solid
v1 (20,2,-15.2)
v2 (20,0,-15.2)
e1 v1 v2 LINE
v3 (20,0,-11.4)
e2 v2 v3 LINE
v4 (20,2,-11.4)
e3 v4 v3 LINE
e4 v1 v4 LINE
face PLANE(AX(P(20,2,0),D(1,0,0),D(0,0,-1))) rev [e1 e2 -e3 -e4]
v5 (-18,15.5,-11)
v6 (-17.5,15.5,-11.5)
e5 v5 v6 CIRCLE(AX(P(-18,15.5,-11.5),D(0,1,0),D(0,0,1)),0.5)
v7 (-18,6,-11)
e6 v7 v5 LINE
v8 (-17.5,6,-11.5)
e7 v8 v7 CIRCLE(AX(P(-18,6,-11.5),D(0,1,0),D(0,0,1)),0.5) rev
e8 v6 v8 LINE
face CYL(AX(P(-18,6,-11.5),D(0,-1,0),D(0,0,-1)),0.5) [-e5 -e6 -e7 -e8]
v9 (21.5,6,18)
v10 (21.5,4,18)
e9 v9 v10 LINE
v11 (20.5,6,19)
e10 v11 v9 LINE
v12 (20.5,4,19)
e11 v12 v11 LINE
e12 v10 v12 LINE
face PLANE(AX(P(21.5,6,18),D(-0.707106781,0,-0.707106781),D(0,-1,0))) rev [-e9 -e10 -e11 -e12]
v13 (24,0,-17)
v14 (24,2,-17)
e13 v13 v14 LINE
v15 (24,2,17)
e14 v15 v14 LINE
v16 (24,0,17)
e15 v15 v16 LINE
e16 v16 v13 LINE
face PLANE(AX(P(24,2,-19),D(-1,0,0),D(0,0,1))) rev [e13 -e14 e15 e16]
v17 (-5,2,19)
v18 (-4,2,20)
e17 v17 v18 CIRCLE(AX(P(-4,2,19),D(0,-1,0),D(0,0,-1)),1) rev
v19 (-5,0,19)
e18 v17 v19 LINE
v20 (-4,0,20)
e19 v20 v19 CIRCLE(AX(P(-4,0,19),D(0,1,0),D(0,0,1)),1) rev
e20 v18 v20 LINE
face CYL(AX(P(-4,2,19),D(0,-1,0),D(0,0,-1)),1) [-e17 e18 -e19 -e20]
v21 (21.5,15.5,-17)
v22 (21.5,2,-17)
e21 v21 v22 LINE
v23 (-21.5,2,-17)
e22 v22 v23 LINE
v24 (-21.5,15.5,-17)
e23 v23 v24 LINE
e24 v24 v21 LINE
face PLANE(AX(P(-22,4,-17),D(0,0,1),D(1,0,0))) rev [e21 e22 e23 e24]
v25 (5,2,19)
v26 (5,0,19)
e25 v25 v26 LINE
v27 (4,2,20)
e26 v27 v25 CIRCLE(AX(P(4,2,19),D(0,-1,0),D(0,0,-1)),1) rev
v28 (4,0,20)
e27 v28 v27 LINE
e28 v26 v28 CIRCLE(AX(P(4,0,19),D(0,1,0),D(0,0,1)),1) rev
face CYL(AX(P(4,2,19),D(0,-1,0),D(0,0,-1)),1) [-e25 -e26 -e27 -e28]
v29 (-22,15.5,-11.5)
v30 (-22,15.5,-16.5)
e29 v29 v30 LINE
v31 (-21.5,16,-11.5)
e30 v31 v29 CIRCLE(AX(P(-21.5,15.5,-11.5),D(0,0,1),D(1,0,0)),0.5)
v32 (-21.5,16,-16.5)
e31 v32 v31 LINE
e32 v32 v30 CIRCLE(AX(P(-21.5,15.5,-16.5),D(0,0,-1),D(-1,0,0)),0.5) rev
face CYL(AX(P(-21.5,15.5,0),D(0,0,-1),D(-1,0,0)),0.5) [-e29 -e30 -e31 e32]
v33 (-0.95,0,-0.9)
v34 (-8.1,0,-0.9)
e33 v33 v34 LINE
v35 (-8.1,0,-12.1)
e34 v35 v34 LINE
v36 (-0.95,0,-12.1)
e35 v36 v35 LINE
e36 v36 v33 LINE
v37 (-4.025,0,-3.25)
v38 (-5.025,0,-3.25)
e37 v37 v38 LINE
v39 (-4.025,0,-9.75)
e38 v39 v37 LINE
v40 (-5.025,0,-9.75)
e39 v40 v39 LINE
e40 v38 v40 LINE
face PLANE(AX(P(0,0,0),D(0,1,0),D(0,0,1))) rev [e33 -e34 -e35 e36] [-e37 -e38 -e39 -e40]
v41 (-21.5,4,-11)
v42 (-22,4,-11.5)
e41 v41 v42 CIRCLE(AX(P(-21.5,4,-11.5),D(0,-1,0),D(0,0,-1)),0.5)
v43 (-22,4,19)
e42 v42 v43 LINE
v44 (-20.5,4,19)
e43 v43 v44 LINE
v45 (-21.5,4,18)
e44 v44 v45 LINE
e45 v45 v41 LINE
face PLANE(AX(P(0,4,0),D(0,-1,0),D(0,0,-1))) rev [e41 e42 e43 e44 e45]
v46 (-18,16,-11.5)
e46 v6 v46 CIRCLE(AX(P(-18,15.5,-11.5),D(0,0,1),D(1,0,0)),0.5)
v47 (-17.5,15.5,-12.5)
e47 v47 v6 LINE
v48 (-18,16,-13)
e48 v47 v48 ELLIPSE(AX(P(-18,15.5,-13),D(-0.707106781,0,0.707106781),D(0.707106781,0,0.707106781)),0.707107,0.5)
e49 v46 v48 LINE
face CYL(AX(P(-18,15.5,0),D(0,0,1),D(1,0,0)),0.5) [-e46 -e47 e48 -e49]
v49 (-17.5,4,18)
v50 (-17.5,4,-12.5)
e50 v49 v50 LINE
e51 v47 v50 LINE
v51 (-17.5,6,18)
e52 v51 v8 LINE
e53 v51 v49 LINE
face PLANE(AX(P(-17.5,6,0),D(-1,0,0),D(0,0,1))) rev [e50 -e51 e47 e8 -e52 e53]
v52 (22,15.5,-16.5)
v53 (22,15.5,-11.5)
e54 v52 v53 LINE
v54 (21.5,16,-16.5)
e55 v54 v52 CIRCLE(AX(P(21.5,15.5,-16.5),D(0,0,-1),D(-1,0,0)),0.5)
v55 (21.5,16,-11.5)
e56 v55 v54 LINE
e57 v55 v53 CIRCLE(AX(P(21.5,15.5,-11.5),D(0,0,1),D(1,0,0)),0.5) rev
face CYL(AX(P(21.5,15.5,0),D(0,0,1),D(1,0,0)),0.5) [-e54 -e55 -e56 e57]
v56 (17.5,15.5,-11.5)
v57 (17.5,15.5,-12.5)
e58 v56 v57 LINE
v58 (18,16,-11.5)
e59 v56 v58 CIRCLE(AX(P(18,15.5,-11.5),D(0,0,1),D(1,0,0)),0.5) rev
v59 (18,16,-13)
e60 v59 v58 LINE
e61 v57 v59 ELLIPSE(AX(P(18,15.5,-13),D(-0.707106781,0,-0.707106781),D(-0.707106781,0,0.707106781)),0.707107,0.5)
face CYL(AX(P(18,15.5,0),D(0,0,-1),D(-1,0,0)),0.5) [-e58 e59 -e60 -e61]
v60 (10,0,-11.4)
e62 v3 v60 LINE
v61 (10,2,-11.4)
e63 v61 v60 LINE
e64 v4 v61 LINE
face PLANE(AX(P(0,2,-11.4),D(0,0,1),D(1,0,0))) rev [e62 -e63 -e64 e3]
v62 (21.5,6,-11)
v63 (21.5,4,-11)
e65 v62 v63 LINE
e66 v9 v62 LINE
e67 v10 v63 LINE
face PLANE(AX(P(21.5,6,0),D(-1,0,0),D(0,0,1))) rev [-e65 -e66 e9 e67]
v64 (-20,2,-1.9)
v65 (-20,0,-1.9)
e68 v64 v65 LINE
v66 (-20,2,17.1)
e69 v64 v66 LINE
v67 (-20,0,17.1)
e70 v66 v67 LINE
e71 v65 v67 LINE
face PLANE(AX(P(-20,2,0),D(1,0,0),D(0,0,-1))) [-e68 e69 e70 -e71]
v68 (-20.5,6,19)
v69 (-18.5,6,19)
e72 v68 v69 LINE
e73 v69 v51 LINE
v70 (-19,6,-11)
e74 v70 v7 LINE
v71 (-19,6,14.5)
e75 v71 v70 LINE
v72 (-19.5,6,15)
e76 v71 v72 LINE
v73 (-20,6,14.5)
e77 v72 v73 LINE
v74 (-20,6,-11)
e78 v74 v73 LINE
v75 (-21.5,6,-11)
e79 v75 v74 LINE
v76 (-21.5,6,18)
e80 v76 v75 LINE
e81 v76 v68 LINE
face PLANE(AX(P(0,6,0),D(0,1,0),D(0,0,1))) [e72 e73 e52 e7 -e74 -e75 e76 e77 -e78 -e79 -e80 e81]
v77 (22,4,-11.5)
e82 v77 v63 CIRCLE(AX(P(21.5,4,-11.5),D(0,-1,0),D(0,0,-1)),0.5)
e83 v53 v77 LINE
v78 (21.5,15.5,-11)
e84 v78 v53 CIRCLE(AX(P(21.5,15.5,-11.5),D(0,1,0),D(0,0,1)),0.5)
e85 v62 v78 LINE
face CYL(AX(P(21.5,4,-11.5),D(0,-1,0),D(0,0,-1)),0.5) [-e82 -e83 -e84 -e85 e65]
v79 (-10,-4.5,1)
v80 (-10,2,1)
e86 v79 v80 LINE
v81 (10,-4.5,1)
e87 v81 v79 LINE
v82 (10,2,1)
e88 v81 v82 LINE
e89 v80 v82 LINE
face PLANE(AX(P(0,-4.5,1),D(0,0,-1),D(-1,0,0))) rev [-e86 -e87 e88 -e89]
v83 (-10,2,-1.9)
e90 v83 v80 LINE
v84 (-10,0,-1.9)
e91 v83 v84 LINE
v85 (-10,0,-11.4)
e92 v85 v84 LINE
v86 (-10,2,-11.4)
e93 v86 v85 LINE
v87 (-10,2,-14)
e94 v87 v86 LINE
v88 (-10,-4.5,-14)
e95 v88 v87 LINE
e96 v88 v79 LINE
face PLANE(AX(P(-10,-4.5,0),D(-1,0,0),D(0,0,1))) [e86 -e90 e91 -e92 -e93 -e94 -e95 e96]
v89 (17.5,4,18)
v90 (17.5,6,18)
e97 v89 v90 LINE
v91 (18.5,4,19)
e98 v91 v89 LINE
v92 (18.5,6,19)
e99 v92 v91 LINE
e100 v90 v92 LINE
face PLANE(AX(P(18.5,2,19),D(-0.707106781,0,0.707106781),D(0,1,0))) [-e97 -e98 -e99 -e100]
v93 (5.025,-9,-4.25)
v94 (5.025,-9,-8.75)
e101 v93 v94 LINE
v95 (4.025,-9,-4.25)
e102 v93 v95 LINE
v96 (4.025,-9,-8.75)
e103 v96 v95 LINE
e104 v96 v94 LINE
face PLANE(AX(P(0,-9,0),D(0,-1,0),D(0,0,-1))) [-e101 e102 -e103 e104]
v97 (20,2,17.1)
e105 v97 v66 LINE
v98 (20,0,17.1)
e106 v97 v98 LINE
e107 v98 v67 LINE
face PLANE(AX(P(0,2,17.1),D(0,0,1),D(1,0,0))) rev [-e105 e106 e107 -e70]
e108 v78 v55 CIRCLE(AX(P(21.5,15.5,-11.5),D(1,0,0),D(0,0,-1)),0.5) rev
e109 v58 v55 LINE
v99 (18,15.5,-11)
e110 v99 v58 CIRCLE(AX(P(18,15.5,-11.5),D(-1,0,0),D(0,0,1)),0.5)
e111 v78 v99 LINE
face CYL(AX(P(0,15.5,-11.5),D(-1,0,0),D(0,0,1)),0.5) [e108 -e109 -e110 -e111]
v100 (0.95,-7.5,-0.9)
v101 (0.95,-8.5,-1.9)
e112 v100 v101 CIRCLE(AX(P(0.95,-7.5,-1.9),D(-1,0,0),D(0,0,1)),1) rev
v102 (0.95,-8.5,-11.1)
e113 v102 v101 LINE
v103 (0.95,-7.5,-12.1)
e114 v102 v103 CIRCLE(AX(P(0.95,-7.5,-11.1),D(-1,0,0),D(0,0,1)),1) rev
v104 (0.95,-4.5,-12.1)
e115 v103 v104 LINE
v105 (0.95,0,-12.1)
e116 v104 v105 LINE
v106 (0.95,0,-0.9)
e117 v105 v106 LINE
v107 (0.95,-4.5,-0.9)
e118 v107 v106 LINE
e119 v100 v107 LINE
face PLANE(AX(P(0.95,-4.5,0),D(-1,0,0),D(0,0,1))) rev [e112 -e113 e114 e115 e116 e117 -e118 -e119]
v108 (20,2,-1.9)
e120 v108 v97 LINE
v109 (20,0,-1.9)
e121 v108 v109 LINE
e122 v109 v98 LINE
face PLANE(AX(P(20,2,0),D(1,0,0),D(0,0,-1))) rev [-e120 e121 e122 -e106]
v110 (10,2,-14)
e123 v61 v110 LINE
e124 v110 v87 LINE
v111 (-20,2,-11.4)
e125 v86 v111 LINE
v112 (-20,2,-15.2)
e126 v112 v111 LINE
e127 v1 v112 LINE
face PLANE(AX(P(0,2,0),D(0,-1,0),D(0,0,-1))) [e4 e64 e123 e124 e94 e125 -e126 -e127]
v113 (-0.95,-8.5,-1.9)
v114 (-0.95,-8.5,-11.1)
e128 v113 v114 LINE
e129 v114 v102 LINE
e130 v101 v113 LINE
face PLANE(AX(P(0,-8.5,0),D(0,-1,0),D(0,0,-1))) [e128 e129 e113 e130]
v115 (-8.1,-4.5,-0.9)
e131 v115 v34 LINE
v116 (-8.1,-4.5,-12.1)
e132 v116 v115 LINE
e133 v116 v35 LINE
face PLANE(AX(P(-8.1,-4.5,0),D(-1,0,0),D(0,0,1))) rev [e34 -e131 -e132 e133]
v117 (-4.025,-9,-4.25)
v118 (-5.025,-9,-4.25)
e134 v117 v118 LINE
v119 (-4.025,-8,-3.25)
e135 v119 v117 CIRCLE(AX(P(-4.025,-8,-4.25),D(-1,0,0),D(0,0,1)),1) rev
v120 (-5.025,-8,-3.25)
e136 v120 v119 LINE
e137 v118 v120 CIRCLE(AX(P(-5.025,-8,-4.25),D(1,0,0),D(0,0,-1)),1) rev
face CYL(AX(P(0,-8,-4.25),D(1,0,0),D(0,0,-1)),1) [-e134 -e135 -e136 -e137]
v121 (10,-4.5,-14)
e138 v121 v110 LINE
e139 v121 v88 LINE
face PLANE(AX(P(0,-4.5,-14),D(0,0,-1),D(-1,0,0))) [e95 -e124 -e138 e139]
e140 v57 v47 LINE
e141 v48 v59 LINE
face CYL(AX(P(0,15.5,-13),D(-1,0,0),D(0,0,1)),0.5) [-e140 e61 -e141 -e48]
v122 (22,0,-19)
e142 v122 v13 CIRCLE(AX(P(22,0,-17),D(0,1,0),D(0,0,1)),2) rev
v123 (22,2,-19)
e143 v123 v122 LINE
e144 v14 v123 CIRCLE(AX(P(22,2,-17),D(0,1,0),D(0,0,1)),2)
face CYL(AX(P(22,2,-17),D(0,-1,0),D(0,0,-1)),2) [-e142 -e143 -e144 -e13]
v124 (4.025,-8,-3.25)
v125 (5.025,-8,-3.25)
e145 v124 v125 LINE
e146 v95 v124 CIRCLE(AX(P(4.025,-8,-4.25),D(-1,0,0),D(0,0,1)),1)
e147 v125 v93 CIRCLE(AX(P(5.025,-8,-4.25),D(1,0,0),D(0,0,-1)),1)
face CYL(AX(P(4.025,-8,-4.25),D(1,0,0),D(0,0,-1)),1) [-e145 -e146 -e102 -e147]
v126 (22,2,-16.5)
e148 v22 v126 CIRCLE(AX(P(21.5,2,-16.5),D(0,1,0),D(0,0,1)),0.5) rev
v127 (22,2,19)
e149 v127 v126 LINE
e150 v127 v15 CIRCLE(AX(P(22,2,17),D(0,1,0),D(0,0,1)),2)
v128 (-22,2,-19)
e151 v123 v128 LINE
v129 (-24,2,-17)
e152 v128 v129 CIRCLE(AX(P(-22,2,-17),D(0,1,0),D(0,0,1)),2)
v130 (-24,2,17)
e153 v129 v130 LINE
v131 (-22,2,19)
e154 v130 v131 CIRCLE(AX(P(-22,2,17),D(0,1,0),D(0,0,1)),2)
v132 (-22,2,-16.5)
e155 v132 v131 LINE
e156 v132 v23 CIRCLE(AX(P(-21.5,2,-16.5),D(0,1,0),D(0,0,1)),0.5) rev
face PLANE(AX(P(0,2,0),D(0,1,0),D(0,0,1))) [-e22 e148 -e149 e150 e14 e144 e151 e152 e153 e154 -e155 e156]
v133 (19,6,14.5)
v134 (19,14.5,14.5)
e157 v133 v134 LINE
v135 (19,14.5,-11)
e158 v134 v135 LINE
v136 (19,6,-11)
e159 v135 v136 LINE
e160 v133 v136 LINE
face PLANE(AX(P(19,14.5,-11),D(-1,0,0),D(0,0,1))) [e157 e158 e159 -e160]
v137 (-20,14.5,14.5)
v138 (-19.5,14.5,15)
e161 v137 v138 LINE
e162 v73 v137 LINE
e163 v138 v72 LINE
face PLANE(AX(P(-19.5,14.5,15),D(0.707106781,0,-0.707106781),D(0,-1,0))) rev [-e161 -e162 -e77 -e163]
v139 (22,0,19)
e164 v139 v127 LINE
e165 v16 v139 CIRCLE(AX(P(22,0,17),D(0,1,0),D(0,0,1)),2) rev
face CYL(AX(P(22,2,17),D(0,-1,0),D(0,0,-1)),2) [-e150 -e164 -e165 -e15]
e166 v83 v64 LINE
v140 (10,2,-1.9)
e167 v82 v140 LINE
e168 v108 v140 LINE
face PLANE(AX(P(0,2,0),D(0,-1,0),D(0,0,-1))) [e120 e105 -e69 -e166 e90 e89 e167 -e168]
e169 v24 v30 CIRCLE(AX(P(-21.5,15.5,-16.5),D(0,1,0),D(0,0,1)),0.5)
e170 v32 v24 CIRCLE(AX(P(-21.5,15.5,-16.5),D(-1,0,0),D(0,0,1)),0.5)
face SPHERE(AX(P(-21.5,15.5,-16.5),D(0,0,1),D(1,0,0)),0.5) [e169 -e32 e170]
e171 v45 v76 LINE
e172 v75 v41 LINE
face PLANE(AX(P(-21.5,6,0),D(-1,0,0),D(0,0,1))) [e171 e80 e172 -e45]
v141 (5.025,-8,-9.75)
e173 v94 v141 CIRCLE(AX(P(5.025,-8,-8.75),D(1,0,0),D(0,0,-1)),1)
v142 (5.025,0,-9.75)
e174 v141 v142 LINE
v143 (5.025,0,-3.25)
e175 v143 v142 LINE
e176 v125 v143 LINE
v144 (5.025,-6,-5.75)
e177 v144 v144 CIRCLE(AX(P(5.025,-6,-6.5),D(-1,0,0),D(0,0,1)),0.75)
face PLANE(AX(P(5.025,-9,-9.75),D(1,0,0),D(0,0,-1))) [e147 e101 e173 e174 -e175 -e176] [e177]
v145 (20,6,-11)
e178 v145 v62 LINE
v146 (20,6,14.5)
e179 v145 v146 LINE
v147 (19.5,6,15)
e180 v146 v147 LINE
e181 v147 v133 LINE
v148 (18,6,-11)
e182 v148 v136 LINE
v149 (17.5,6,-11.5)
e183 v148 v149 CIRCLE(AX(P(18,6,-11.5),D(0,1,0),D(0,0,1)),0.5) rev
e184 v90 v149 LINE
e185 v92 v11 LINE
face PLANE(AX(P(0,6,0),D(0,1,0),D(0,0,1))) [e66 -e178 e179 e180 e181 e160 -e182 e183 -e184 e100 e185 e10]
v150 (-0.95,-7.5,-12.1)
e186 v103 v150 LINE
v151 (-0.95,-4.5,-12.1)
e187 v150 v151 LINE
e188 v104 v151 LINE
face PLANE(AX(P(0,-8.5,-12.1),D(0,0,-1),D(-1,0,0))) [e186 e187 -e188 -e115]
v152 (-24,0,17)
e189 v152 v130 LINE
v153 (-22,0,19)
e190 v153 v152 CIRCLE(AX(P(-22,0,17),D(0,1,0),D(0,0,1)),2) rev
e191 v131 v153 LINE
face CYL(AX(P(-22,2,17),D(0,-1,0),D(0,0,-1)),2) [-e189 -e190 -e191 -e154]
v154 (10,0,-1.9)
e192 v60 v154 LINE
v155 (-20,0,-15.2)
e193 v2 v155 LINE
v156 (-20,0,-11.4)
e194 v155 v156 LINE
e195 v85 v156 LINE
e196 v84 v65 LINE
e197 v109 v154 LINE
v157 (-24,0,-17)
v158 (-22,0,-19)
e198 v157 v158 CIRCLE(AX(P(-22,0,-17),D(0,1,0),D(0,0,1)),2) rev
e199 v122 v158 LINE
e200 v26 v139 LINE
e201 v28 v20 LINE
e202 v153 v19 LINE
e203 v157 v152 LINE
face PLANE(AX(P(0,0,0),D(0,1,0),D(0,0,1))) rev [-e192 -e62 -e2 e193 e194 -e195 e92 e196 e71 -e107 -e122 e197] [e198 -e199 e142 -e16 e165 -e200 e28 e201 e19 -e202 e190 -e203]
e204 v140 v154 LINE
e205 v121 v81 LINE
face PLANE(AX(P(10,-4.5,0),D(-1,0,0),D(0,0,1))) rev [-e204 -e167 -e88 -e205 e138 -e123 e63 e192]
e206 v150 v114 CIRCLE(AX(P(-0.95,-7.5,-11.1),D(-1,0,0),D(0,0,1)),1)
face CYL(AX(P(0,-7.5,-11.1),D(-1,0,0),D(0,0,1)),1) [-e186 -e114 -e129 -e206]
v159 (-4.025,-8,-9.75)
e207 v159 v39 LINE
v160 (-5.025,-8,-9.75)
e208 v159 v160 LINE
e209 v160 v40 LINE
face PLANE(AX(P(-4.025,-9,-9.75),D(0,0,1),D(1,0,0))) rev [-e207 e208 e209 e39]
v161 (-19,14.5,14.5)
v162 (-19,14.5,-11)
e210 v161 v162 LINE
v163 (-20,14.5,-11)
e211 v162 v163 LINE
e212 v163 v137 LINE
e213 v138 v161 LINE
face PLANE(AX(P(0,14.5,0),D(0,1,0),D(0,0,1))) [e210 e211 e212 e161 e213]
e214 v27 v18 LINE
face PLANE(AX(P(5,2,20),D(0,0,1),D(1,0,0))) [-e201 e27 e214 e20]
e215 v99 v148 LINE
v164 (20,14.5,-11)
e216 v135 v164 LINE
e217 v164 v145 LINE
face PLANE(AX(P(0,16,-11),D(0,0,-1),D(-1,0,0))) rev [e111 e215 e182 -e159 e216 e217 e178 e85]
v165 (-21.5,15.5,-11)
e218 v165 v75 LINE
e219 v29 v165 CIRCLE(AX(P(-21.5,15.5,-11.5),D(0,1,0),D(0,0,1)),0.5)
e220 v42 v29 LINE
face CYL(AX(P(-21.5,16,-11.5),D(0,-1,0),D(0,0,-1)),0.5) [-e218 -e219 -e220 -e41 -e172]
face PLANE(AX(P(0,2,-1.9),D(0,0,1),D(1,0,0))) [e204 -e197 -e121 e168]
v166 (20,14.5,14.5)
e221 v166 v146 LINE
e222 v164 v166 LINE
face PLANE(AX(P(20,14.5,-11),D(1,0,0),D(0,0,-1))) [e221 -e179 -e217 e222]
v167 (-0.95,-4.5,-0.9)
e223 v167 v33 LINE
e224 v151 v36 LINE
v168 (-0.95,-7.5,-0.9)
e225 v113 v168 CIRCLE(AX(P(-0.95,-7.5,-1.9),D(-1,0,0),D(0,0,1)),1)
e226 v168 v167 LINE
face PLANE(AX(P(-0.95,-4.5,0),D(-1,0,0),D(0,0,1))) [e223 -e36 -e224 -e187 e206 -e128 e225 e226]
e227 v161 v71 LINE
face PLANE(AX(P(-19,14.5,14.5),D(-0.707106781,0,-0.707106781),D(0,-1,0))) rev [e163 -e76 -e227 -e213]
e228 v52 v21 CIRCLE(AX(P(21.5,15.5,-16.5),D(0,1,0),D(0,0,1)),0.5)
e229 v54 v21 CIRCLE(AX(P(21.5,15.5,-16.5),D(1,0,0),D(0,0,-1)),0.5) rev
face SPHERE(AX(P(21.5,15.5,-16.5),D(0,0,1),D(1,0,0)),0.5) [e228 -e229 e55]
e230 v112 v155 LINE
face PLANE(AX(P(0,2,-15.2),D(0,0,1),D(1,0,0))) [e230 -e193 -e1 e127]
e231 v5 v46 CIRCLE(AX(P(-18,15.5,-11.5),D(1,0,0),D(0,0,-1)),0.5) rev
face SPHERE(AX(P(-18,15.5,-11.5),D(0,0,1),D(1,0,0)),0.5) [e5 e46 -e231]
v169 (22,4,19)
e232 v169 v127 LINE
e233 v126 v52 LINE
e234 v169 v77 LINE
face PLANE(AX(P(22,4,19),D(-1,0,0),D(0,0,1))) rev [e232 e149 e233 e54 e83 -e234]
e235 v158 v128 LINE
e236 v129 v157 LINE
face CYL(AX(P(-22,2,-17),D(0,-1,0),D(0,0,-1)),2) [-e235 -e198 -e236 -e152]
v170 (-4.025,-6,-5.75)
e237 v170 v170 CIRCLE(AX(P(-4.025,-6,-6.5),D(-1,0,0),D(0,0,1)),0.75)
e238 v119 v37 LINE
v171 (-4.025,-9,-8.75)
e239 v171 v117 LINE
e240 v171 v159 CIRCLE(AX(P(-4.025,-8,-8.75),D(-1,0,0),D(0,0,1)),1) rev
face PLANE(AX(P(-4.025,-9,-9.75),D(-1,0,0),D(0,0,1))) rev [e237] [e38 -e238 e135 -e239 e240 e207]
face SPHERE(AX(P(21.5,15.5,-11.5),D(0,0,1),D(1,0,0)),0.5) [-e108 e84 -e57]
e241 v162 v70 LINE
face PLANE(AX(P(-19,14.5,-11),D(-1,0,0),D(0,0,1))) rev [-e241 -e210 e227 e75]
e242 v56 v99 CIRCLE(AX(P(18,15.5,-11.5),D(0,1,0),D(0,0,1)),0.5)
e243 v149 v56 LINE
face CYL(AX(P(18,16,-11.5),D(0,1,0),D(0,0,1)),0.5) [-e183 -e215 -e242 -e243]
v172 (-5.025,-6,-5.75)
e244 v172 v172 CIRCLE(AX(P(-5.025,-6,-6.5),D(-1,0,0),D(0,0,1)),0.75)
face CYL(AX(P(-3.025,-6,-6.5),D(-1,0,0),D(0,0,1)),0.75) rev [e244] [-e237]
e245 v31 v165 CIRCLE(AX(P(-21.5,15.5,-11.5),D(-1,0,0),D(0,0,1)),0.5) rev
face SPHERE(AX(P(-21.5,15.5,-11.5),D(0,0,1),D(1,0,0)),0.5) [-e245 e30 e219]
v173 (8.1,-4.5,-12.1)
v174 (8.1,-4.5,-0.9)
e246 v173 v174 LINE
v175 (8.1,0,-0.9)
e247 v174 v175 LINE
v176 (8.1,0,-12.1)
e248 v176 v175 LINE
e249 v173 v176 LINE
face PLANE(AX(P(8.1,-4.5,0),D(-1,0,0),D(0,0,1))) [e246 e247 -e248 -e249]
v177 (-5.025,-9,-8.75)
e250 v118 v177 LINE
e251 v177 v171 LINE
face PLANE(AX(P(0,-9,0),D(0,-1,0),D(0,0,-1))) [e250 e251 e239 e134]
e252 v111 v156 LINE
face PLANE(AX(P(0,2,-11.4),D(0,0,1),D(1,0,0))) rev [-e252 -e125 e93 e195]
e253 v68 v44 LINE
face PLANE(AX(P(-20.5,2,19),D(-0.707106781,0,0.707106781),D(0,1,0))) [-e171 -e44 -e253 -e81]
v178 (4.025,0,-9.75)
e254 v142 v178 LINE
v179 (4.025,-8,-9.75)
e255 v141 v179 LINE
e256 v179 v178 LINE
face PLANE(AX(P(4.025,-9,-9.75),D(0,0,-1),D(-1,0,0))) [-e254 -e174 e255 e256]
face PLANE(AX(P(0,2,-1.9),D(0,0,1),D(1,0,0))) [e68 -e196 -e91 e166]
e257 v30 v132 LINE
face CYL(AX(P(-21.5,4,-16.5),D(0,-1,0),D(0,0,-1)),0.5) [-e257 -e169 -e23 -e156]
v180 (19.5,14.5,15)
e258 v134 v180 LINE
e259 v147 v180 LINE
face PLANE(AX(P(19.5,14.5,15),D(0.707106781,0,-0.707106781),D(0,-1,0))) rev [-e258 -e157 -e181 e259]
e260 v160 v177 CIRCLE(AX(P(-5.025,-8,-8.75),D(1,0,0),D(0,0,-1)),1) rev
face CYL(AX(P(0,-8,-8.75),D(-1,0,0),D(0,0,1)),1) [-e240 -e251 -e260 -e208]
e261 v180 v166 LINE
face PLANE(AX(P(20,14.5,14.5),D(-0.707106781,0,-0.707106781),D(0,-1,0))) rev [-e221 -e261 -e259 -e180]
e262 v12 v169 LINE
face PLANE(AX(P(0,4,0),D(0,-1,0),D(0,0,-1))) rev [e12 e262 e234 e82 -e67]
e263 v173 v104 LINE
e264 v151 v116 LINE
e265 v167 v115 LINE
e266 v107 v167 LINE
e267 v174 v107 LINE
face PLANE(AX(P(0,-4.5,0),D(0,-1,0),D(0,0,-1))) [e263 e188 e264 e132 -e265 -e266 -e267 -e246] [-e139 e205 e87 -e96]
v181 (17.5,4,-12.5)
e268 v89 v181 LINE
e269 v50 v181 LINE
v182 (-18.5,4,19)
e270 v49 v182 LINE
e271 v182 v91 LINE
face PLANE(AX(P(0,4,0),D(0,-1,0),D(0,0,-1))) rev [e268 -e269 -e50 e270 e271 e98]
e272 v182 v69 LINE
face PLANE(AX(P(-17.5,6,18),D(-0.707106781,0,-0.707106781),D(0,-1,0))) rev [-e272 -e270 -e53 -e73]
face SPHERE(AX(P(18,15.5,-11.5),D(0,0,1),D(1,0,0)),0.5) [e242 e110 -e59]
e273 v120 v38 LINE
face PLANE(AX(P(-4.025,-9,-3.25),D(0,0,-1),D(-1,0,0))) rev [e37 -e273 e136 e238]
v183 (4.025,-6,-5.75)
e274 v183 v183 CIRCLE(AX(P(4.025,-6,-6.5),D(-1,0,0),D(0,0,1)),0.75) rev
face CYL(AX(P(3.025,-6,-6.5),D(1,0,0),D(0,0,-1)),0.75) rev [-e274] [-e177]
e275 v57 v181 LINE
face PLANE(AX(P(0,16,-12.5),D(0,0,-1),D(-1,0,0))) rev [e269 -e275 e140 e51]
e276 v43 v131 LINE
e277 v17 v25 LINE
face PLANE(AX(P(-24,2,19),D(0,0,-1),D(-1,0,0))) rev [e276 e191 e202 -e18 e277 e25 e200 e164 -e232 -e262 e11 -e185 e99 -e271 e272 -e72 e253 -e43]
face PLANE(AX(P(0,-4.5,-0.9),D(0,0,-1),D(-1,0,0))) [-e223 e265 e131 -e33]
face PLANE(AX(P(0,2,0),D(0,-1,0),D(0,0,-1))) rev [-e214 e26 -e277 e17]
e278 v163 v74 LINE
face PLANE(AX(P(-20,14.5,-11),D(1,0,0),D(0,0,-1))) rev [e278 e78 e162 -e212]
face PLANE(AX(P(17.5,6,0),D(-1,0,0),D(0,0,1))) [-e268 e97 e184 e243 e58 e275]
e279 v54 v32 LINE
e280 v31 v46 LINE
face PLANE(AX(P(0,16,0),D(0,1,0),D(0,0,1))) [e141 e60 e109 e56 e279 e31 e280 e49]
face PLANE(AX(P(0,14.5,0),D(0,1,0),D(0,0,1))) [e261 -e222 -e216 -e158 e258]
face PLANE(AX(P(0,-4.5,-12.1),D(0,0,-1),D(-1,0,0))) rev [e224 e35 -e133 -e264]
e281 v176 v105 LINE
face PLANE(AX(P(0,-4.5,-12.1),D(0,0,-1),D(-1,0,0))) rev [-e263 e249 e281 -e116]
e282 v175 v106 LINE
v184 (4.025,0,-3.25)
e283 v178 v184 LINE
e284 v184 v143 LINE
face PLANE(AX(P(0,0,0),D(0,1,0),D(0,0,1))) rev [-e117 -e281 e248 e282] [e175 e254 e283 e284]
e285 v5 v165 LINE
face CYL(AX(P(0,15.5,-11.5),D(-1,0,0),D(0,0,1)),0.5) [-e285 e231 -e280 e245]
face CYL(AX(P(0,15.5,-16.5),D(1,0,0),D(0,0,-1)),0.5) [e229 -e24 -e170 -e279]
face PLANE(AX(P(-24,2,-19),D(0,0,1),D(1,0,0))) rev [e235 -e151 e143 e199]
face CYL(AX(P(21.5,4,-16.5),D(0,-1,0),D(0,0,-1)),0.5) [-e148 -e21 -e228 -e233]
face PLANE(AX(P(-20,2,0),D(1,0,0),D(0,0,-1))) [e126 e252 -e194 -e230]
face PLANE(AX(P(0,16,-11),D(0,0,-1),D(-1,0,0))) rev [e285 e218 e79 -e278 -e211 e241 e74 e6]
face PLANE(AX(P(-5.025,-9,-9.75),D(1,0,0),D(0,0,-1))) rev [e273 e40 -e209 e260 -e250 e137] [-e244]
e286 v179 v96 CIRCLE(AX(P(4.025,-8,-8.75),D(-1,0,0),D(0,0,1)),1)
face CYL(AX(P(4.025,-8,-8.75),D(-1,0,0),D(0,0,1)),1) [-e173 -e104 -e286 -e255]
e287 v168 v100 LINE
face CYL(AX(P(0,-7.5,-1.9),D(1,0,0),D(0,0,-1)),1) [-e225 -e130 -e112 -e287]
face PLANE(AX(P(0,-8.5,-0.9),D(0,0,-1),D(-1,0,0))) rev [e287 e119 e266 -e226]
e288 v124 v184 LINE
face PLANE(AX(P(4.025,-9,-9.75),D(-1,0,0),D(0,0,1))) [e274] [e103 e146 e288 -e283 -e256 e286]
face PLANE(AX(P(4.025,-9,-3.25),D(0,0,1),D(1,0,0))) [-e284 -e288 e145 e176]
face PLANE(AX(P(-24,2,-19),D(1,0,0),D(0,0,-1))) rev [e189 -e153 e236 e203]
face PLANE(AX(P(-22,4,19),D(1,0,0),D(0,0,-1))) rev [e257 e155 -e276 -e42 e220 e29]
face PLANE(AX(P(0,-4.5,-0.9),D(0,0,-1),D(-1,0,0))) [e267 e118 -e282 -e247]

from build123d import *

# Parameters (mm, degrees)
SKETCH1_W                = 48
SKETCH1_H                = 38
BOSS_EXTRUDE1_DEPTH      = 2
SKETCH2_W                = 44
SKETCH2_H                = 36
BOSS_EXTRUDE2_DEPTH      = 2
SKETCH3_W                = 4
SKETCH3_H                = 30
BOSS_EXTRUDE3_DEPTH      = 2
CHAMFER1_SIZE            = 1
BOSS_EXTRUDE4_DEPTH      = 12
FILLET1_R                = 0.5
SKETCH5_W                = 1
SKETCH5_H                = 26
BOSS_EXTRUDE5_DEPTH      = 8.5
CHAMFER2_SIZE            = 0.5
CHAMFER2_OF_MIRROR1_SIZE = 0.5
SKETCH6_W                = 10
SKETCH6_H                = 1
BOSS_EXTRUDE6_DEPTH      = 2
FILLET2_R                = 1
SKETCH7_W                = 0.95
SKETCH7_H                = 1.9
SKETCH7_H_2              = 11.2
BOSS_EXTRUDE7_DEPTH      = 4.5
SKETCH8_W                = 1.9
SKETCH8_H                = 11.2
BOSS_EXTRUDE8_DEPTH      = 4
SKETCH9_W                = 1
SKETCH9_H                = 6.5
BOSS_EXTRUDE9_DEPTH      = 9
FILLET3_R                = 1
SKETCH10_R               = 0.75
CUT_EXTRUDE1_DEPTH       = 2
FILLET3_OF_MIRROR2_R     = 1
CUT_EXTRUDE2_DEPTH       = 2
FILLET4_R                = 1
FILLET5_R                = 2


with BuildPart() as part:
    # Sketch1 → Boss-Extrude1 (new body)
    with BuildSketch(Plane(origin=(0, 0, 0), x_dir=(1, 0, 0), z_dir=(0, 1, 0))):
        Rectangle(SKETCH1_W, SKETCH1_H)
    extrude(amount=BOSS_EXTRUDE1_DEPTH)

    # Sketch2 → Boss-Extrude2 (add)
    with BuildSketch(Plane(origin=(0, 2, 0), x_dir=(1, 0, 0), z_dir=(0, 1, 0))):
        with Locations((0, -1)):
            Rectangle(SKETCH2_W, SKETCH2_H)
    extrude(amount=BOSS_EXTRUDE2_DEPTH)

    # Sketch3 → Boss-Extrude3 (add)
    with BuildSketch(Plane(origin=(0, 4, 0), x_dir=(1, 0, 0), z_dir=(0, 1, 0))):
        with Locations((-19.5, -4)):
            Rectangle(SKETCH3_W, SKETCH3_H)
        with Locations((19.5, -4)):
            Rectangle(SKETCH3_W, SKETCH3_H)
    extrude(amount=BOSS_EXTRUDE3_DEPTH)

    # Chamfer1
    chamfer1_edges = [part.edges().sort_by_distance(p)[0] for p in [
        (-21.5, 5, 19),
        (-17.5, 5, 19),
        (17.5, 5, 19),
        (21.5, 5, 19),
    ]]
    chamfer(chamfer1_edges, length=CHAMFER1_SIZE)

    # Sketch4 → Boss-Extrude4 (add)
    with BuildSketch(Plane(origin=(0, 4, 0), x_dir=(1, 0, 0), z_dir=(0, 1, 0))):
        Polygon((22, 17), (-22, 17), (-22, 11), (-21.5, 11), (-17.5, 11), (-17.5, 12.5), (17.5, 12.5), (17.5, 11), (21.5, 11), (22, 11), align=None)
    extrude(amount=BOSS_EXTRUDE4_DEPTH)

    # Fillet1
    fillet1_edges = [part.edges().sort_by_distance(p)[0] for p in [
        (17.5, 11, -11),
        (17.5, 16, -11.75),
        (22, 10, -11),
        (-22, 10, -11),
        (-17.5, 11, -11),
        (19.75, 16, -11),
        (22, 16, -14),
        (0, 16, -17),
        (-22, 16, -14),
        (-19.75, 16, -11),
        (-17.5, 16, -11.75),
        (0, 16, -12.5),
        (-22, 9, -17),
        (22, 9, -17),
    ]]
    fillet(fillet1_edges, radius=FILLET1_R - 0.0001)  # a hair under: the kernel refuses the full size

    # Sketch5 → Boss-Extrude5 (add)
    with BuildSketch(Plane(origin=(0, 6, 0), x_dir=(1, 0, 0), z_dir=(0, 1, 0))):
        with Locations((-19.5, -2)):
            Rectangle(SKETCH5_W, SKETCH5_H)
    boss_extrude5 = extrude(amount=BOSS_EXTRUDE5_DEPTH)

    # Chamfer2
    chamfer2_edges = [part.edges().sort_by_distance(p)[0] for p in [
        (-19, 10.25, 15),
        (-20, 10.25, 15),
    ]]
    chamfer(chamfer2_edges, length=CHAMFER2_SIZE - 0.0001)  # a hair under: the kernel refuses the full size

    # Mirror1: Boss-Extrude5 across plane
    add(boss_extrude5.mirror(Plane.ZY))

    # Chamfer2 of Mirror1
    chamfer2_of_mirror1_edges = [part.edges().sort_by_distance(p)[0] for p in [
        (19, 10.25, 15),
        (20, 10.25, 15),
    ]]
    chamfer(chamfer2_of_mirror1_edges, length=CHAMFER2_OF_MIRROR1_SIZE - 0.0001)  # a hair under: the kernel refuses the full size

    # Sketch6 → Boss-Extrude6 (add)
    with BuildSketch(Plane.XZ):
        with Locations((0, 19.5)):
            Rectangle(SKETCH6_W, SKETCH6_H)
    extrude(amount=-BOSS_EXTRUDE6_DEPTH)

    # Fillet2
    fillet2_edges = [part.edges().sort_by_distance(p)[0] for p in [
        (-5, 1, 20),
        (5, 1, 20),
    ]]
    fillet(fillet2_edges, radius=FILLET2_R - 0.0001)  # a hair under: the kernel refuses the full size

    # Sketch7 → Boss-Extrude7 (add)
    with BuildSketch(Plane.XZ):
        Polygon((-10, -14), (-0.95, -14), (-0.95, -12.1), (-8.1, -12.1), (-8.1, -0.9), (-0.95, -0.9), (-0.95, 1), (-10, 1), align=None)
        with Locations((-0.475, -13.05)):
            Rectangle(SKETCH7_W, SKETCH7_H)
        with Locations((0.475, -13.05)):
            Rectangle(SKETCH7_W, SKETCH7_H)
        Polygon((0.95, -14), (10, -14), (10, 1), (0.95, 1), (0.95, -0.9), (8.1, -0.9), (8.1, -12.1), (0.95, -12.1), align=None)
        with Locations((-0.475, -6.5)):
            Rectangle(SKETCH7_W, SKETCH7_H_2)
        with Locations((0.475, -6.5)):
            Rectangle(SKETCH7_W, SKETCH7_H_2)
        with Locations((-0.475, 0.05)):
            Rectangle(SKETCH7_W, SKETCH7_H)
        with Locations((0.475, 0.05)):
            Rectangle(SKETCH7_W, SKETCH7_H)
    extrude(amount=BOSS_EXTRUDE7_DEPTH)

    # Sketch8 → Boss-Extrude8 (add)
    with BuildSketch(Plane.XZ.offset(4.5)):
        with Locations((0, -6.5)):
            Rectangle(SKETCH8_W, SKETCH8_H)
    extrude(amount=BOSS_EXTRUDE8_DEPTH)

    # Sketch9 → Boss-Extrude9 (add)
    with BuildSketch(Plane.XZ):
        with Locations((-4.525, -6.5)):
            Rectangle(SKETCH9_W, SKETCH9_H)
    boss_extrude9 = extrude(amount=BOSS_EXTRUDE9_DEPTH)

    # Fillet3
    fillet3_edges = [part.edges().sort_by_distance(p)[0] for p in [
        (-4.525, -9, -3.25),
        (-4.525, -9, -9.75),
    ]]
    fillet(fillet3_edges, radius=FILLET3_R)

    # Sketch10 → Cut-Extrude1 (cut)
    with BuildSketch(Plane.ZY.offset(5.025)):
        with Locations((-6.5, -6)):
            Circle(SKETCH10_R)
    cut_extrude1 = extrude(amount=-CUT_EXTRUDE1_DEPTH, mode=Mode.SUBTRACT)

    # Mirror2: Boss-Extrude9, Cut-Extrude1 across plane
    add(boss_extrude9.mirror(Plane.ZY))
    add(cut_extrude1.mirror(Plane.ZY), mode=Mode.SUBTRACT)

    # Fillet3 of Mirror2
    fillet3_of_mirror2_edges = [part.edges().sort_by_distance(p)[0] for p in [
        (4.525, -9, -3.25),
        (4.525, -9, -9.75),
    ]]
    fillet(fillet3_of_mirror2_edges, radius=FILLET3_OF_MIRROR2_R)

    # Sketch11 → Cut-Extrude2 (cut)
    with BuildSketch(Plane.XZ):
        Polygon((20, -11.4), (10, -11.4), (10, -14), (-10, -14), (-10, -11.4), (-20, -11.4), (-20, -15.2), (20, -15.2), align=None)
        Polygon((10, -1.9), (20, -1.9), (20, 17.1), (-20, 17.1), (-20, -1.9), (-10, -1.9), (-10, 1), (10, 1), align=None)
    extrude(amount=-CUT_EXTRUDE2_DEPTH, mode=Mode.SUBTRACT)

    # Fillet4
    fillet4_edges = [part.edges().sort_by_distance(p)[0] for p in [
        (0, -8.5, -12.1),
        (0, -8.5, -0.9),
    ]]
    fillet(fillet4_edges, radius=FILLET4_R)

    # Fillet5
    fillet5_edges = [part.edges().sort_by_distance(p)[0] for p in [
        (-24, 1, -19),
        (-24, 1, 19),
        (24, 1, 19),
        (24, 1, -19),
    ]]
    fillet(fillet5_edges, radius=FILLET5_R)


solid = part.part
